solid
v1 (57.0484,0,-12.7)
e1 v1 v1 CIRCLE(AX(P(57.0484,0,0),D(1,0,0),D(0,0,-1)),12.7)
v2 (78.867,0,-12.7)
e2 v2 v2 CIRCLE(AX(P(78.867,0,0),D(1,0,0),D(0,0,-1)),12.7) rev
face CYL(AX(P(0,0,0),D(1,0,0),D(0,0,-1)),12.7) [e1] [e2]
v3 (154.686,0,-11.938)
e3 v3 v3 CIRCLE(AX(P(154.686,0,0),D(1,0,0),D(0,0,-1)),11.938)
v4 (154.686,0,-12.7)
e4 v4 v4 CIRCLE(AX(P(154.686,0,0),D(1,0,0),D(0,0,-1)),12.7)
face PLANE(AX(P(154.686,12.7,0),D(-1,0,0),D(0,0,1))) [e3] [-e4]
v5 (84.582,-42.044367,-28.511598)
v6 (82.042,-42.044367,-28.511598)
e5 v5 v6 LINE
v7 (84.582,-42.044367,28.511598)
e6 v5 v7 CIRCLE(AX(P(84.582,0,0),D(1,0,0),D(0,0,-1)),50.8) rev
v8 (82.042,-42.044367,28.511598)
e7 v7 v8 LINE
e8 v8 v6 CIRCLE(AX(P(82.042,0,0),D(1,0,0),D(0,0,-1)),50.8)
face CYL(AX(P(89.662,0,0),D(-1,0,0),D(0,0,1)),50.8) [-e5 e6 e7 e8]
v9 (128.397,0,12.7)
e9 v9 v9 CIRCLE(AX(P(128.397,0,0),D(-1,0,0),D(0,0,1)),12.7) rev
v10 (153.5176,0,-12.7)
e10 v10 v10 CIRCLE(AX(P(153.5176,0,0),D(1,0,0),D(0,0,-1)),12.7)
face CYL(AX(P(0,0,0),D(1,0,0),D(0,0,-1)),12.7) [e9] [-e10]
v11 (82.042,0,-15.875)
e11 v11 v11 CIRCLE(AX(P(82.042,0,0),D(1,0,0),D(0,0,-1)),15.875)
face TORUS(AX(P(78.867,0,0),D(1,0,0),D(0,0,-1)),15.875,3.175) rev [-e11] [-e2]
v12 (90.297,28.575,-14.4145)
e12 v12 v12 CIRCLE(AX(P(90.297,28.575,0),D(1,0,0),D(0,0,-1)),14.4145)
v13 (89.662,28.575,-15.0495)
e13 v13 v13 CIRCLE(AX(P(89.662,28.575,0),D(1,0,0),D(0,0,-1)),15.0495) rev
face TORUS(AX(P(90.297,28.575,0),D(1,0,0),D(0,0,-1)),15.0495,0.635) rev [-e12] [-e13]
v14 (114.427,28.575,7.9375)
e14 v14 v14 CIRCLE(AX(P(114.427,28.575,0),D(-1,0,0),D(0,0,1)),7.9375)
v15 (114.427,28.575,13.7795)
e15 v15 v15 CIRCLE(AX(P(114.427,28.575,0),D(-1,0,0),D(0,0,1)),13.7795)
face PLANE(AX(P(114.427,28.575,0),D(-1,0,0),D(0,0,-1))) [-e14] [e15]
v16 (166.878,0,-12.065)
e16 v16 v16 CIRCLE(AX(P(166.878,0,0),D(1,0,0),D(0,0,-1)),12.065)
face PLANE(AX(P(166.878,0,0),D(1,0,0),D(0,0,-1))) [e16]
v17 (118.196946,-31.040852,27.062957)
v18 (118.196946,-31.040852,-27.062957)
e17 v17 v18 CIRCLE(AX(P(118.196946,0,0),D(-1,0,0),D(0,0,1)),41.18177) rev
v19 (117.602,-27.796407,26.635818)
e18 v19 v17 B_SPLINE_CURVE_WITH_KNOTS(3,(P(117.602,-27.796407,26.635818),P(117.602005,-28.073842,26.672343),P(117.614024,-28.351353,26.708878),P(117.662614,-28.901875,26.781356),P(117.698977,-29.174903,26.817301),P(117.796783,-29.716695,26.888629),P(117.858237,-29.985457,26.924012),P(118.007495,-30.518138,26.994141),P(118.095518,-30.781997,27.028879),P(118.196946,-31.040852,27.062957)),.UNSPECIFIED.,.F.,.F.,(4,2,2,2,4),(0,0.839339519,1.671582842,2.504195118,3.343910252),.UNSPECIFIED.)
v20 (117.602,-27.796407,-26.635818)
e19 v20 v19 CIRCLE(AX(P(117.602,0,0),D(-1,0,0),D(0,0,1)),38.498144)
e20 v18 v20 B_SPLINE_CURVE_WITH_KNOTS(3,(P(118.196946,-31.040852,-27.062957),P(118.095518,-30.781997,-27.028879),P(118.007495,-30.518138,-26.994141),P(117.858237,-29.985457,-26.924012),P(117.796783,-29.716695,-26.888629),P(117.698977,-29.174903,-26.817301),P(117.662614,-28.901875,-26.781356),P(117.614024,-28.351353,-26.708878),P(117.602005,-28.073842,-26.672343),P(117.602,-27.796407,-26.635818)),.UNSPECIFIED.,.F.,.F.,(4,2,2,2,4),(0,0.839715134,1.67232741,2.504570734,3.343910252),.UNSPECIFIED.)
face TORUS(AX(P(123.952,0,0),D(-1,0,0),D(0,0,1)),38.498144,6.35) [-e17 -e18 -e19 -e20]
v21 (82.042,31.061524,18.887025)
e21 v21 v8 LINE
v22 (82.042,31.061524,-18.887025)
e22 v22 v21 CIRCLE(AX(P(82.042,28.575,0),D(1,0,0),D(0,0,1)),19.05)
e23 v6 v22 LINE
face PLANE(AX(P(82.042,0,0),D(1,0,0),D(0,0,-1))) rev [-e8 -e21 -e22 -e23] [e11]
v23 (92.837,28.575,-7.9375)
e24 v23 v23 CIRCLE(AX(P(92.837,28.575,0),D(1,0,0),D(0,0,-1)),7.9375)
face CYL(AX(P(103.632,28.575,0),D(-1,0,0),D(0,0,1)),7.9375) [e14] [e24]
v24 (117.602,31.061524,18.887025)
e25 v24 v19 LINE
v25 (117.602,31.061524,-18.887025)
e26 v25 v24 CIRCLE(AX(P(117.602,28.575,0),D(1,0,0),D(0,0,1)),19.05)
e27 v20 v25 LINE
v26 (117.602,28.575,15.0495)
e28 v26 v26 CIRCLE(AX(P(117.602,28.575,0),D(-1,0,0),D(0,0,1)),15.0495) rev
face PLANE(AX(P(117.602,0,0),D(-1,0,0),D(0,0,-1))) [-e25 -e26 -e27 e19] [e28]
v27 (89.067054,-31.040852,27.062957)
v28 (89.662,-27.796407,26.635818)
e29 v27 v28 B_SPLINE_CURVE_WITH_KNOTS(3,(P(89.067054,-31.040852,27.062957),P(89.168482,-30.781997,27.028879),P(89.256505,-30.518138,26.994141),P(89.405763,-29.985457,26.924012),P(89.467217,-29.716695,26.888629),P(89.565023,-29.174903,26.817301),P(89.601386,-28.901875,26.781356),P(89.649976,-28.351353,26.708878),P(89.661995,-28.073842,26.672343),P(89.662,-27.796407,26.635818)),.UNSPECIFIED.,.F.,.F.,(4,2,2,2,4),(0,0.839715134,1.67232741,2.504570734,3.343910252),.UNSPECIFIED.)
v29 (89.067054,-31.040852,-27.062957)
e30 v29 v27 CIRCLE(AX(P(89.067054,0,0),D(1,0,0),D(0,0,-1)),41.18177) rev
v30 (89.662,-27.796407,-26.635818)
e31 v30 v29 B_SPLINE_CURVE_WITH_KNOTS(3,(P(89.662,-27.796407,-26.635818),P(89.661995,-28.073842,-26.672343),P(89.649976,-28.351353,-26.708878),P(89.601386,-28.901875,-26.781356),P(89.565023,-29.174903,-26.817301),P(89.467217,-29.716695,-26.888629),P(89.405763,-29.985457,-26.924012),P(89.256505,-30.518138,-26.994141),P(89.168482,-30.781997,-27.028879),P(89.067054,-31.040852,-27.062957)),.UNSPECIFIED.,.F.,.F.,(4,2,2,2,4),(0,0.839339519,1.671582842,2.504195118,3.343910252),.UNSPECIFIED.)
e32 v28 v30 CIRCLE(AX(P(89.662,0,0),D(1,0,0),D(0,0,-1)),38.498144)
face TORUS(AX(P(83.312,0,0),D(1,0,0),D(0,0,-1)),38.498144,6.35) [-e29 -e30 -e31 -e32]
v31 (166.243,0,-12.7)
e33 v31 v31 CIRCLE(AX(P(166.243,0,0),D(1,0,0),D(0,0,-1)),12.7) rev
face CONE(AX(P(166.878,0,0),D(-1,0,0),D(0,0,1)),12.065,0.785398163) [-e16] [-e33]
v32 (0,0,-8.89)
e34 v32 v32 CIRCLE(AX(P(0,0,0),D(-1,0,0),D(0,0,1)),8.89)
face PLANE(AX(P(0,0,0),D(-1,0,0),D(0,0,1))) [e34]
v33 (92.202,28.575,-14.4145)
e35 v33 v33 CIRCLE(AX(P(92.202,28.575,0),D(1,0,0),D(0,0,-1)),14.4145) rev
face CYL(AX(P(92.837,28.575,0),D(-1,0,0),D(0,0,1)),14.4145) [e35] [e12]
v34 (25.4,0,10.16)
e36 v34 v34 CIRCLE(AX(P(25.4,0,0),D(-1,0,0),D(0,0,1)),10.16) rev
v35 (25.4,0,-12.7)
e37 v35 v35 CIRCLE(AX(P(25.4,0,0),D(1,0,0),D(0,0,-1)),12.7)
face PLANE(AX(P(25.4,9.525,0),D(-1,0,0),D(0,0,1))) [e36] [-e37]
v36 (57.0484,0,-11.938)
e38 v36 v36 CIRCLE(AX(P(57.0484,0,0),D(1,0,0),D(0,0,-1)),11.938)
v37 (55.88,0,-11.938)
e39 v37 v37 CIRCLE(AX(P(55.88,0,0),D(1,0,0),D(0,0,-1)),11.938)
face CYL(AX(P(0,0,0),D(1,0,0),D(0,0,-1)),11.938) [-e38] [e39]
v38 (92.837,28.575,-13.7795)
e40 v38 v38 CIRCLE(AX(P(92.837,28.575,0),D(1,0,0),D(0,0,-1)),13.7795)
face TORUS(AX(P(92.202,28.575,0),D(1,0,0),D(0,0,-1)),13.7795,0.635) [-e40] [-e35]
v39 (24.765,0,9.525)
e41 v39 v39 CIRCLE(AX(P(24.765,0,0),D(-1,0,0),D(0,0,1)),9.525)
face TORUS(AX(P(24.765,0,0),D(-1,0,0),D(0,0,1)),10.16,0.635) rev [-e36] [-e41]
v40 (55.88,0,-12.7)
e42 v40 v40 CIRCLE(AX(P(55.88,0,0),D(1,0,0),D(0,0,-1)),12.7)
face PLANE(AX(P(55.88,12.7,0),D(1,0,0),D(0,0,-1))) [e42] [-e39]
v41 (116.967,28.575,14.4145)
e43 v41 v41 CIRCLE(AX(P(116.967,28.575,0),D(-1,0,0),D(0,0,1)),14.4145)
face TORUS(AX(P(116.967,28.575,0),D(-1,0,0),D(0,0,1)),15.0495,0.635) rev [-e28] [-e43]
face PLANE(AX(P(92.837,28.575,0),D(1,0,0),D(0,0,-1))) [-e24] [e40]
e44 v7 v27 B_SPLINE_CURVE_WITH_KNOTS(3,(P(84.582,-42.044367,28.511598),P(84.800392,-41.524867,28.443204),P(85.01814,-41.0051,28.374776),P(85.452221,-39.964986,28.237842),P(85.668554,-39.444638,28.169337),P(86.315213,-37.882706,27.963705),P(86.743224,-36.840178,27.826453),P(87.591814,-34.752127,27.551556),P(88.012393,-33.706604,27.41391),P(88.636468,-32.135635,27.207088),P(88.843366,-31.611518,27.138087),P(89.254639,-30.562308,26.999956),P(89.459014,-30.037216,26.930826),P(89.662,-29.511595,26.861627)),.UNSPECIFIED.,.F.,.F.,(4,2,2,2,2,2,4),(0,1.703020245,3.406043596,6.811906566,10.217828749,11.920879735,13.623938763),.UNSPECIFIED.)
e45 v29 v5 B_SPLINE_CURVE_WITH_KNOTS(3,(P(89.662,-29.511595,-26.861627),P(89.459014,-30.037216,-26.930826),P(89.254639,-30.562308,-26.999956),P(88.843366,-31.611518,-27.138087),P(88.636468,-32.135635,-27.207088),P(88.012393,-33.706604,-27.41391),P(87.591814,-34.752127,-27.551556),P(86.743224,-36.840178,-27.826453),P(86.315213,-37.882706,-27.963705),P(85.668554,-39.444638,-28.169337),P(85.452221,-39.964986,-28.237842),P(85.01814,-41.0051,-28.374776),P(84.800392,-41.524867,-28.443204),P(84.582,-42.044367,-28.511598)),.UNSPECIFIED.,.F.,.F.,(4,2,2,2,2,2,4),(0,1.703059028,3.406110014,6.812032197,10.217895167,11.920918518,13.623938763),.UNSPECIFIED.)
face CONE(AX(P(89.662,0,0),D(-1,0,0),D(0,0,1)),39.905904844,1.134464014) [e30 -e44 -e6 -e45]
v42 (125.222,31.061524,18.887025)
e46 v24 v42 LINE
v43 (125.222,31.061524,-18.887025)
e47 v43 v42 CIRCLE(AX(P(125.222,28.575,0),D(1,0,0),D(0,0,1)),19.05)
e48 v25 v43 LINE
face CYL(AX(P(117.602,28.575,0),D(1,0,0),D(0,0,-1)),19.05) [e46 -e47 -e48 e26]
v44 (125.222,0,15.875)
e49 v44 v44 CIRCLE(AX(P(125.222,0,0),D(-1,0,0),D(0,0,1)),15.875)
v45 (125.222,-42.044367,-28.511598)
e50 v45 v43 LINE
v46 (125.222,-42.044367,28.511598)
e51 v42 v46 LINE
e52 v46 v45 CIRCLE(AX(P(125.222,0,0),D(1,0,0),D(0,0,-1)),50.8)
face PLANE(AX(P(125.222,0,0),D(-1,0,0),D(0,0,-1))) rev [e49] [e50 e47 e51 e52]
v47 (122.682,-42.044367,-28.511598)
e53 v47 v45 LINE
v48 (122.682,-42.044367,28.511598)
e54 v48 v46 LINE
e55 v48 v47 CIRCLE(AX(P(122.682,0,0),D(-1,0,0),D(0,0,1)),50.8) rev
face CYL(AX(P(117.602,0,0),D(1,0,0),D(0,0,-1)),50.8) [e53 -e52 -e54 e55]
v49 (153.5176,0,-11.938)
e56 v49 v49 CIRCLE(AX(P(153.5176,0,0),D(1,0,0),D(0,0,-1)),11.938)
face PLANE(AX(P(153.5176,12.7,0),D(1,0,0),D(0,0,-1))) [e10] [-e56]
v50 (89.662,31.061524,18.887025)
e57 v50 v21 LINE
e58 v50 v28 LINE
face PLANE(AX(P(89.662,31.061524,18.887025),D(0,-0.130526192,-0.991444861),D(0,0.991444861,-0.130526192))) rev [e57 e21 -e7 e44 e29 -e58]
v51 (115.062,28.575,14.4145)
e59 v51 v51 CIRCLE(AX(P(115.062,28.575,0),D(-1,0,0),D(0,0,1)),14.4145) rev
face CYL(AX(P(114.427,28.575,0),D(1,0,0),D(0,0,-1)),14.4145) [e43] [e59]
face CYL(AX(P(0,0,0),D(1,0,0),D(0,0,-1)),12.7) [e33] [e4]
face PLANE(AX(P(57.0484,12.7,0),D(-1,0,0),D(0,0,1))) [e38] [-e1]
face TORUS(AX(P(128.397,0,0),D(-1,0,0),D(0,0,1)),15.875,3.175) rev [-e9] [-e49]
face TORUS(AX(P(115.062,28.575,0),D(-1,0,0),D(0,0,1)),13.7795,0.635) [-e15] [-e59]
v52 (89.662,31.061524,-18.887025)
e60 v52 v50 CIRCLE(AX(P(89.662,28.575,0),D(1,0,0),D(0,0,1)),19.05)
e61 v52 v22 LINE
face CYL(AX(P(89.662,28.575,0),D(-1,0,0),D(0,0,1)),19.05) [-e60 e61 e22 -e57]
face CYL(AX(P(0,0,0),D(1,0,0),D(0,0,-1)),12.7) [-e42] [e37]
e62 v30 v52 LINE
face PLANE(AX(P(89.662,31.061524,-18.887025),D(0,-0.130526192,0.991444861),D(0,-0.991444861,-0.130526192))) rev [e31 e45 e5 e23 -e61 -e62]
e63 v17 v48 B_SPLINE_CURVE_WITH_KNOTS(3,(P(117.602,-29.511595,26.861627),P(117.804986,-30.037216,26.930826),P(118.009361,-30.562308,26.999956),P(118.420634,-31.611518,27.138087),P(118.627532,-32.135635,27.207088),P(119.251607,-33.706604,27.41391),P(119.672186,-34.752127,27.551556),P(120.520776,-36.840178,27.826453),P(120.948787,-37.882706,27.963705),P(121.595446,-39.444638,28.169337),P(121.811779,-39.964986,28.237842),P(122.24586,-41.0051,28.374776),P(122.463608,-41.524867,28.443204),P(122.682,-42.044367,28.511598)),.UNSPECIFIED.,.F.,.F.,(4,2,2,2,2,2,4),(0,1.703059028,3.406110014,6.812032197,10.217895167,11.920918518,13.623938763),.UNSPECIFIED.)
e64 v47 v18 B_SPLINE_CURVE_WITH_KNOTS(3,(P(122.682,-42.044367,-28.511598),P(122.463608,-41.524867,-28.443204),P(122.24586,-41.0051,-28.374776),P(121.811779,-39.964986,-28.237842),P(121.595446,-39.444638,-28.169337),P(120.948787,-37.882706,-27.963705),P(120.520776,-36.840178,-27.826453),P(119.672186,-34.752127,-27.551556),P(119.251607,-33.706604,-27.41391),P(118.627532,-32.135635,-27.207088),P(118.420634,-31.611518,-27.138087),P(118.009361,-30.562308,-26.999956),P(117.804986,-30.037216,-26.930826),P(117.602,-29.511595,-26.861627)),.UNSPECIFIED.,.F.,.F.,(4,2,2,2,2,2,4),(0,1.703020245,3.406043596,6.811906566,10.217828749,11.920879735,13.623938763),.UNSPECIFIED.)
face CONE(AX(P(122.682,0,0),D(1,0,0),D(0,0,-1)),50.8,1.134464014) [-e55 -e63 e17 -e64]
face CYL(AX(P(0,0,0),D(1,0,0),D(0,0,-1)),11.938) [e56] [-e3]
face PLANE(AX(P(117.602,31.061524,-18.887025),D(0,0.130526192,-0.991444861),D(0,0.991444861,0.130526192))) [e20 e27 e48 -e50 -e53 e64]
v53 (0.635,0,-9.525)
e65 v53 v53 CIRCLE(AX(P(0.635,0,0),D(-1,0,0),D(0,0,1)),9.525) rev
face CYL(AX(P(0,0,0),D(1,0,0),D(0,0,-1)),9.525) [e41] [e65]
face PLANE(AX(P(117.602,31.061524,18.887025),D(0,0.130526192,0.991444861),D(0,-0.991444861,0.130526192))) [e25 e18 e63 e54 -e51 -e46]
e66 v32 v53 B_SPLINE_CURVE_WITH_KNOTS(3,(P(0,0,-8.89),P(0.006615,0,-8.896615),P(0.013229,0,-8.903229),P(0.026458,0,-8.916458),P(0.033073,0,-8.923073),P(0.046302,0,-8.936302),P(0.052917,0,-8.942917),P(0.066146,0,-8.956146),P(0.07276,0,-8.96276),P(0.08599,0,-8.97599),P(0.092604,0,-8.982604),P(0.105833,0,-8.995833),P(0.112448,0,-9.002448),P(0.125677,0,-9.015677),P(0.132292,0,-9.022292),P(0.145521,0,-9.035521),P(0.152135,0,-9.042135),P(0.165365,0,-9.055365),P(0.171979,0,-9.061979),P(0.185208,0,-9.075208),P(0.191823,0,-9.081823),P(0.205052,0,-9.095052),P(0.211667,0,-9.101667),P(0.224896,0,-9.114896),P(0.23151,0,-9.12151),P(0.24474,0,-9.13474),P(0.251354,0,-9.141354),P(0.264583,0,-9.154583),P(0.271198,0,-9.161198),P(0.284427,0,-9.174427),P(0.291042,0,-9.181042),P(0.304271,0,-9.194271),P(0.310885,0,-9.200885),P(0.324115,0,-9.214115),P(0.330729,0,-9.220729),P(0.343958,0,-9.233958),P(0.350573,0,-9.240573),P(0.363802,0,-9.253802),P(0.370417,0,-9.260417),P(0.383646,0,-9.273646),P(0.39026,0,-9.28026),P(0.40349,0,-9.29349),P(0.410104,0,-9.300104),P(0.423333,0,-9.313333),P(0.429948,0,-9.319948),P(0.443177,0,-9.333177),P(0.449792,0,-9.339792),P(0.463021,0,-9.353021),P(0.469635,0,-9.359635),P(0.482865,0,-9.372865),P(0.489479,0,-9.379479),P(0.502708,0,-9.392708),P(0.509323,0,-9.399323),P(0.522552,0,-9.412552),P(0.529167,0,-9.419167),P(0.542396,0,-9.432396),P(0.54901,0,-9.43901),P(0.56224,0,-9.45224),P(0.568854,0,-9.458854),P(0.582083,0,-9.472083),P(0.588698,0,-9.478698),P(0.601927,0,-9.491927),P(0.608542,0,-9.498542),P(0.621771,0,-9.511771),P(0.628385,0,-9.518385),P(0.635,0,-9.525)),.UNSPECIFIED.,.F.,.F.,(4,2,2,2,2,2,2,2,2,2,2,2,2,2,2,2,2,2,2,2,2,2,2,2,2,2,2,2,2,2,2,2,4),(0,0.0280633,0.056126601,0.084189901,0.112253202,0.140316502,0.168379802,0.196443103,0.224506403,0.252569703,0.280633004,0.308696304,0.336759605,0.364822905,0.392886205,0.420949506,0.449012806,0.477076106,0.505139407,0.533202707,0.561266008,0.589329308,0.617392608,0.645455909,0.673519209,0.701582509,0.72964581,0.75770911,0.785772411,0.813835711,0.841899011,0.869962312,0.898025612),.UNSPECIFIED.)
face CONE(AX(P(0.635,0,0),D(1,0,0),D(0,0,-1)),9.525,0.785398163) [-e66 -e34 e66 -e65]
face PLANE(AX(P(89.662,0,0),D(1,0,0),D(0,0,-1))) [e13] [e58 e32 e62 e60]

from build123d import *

# Parameters (mm, degrees)
BOSS_EXTRUDE1_DEPTH   = 7.62
SKETCH3_R             = 14.4145
BOSS_EXTRUDE2_DEPTH   = 3.175
SKETCH4_R             = 7.9375
BOSS_EXTRUDE3_DEPTH   = 10.795
CHAMFER1_SIZE         = 5.08
CHAMFER1_SIZE2        = 10.894095156
FILLET1_R             = 6.35
MIRROR1_START         = 117.602
MIRROR1_OUTLINE_R     = 12.7
MIRROR1_DEPTH         = 7.62
MIRROR1_START_2       = 103.632
MIRROR1_2_OUTLINE_R   = 7.9375
MIRROR1_2_DEPTH       = 13.97
MIRROR1_START_3       = 114.427
MIRROR1_3_OUTLINE_R   = 14.4145
MIRROR1_3_OUTLINE_R_2 = 7.9375
MIRROR1_3_DEPTH       = 3.175
MIRROR1_4_ANGLE       = 87.55708
FILLET2_R             = 0.635
CUT_EXTRUDE1_START    = 27.94
SKETCH5_R             = 12.7
CUT_EXTRUDE1_DEPTH    = 27.94
CHAMFER2_SIZE         = 0.635
FILLET3_R             = 3.175


with BuildPart() as part:
    # Sketch1 → Revolve1 (revolve)
    with BuildSketch(Plane.XY, mode=Mode.PRIVATE) as revolve1_sk:
        Polygon((25.4, 12.7), (55.88, 12.7), (55.88, 11.938), (57.0484, 11.938), (57.0484, 12.7), (153.5176, 12.7), (153.5176, 11.938), (154.686, 11.938), (154.686, 12.7), (166.878, 12.7), (166.878, 0), (0, 0), (0, 9.525), (25.4, 9.525), align=None)
    revolve(revolve1_sk.sketch.rotate(Axis((0, 0, 0), (-1, 0, 0)), 90), axis=Axis((0, 0, 0), (-1, 0, 0)))

    # Sketch2 → Boss-Extrude1 (add)
    with BuildSketch(Plane(origin=(82.042, 0, 0), x_dir=(0, 0, -1), z_dir=(1, 0, 0))):
        with BuildLine():
            Line((-18.887024609, 31.061523962), (-28.511597739, -42.044366975))
            ThreePointArc((-28.511597739, -42.044366975), (0, -50.8), (28.511597739, -42.044366975))
            Line((28.511597739, -42.044366975), (18.887024609, 31.061523962))
            ThreePointArc((18.887024609, 31.061523962), (0, 47.625), (-18.887024609, 31.061523962))
        make_face()
    extrude(amount=BOSS_EXTRUDE1_DEPTH)

    # Sketch3 → Boss-Extrude2 (add)
    with BuildSketch(Plane(origin=(89.662, 0, 0), x_dir=(0, 0, -1), z_dir=(1, 0, 0))):
        with Locations((0, 28.575)):
            Circle(SKETCH3_R)
    extrude(amount=BOSS_EXTRUDE2_DEPTH)

    # Sketch4 → Boss-Extrude3 (add)
    with BuildSketch(Plane(origin=(92.837, 0, 0), x_dir=(0, 0, -1), z_dir=(1, 0, 0))):
        with Locations((0, 28.575)):
            Circle(SKETCH4_R)
    extrude(amount=BOSS_EXTRUDE3_DEPTH)

    # Chamfer1
    chamfer1_edges = [part.edges().sort_by_distance(p)[0] for p in [
        (89.662, -50.8, 0),
    ]]
    chamfer1_side = [part.faces().sort_by_distance(p)[0] for p in [
        (85.852, -50.8, 0),
    ]]
    chamfer(chamfer1_edges, length=CHAMFER1_SIZE, length2=CHAMFER1_SIZE2, reference=chamfer1_side[0])

    # Fillet1
    fillet1_edges = [part.edges().sort_by_distance(p)[0] for p in [
        (89.662, -39.905904844, 0),
    ]]
    fillet(fillet1_edges, radius=FILLET1_R)

    # Mirror1: read off the stored shape, not the designer's step
    # Mirror1 outline → Mirror1 (add)
    with BuildSketch(Plane.YZ.offset(MIRROR1_START)):
        with BuildLine():
            Line((31.061523962, 18.887024609), (-42.044366975, 28.511597739))
            ThreePointArc((-42.044366975, 28.511597739), (-50.8, 0), (-42.044366975, -28.511597739))
            Line((-42.044366975, -28.511597739), (31.061523962, -18.887024609))
            ThreePointArc((31.061523962, -18.887024609), (47.625, 0), (31.061523962, 18.887024609))
        make_face()
        Circle(MIRROR1_OUTLINE_R, mode=Mode.SUBTRACT)
    extrude(amount=MIRROR1_DEPTH)

    # Mirror1 2 outline → Mirror1 2 (add)
    with BuildSketch(Plane.YZ.offset(MIRROR1_START_2)):
        with Locations((28.575, 0)):
            Circle(MIRROR1_2_OUTLINE_R)
    extrude(amount=MIRROR1_2_DEPTH)

    # Mirror1 3 outline → Mirror1 3 (add)
    with BuildSketch(Plane.YZ.offset(MIRROR1_START_3)):
        with Locations((28.575, 0)):
            Circle(MIRROR1_3_OUTLINE_R)
        with Locations((28.575, 0)):
            Circle(MIRROR1_3_OUTLINE_R_2, mode=Mode.SUBTRACT)
    extrude(amount=MIRROR1_3_DEPTH)

    # Mirror1 4 outline → Mirror1 4 (revolve, cut)
    with BuildSketch(Plane(origin=(0, 0, 0), x_dir=(0, -0.7220194162000995, 0.6918727936767477), z_dir=(0, 0.6918727936767477, 0.7220194162000995))):
        with BuildLine():
            Line((50.8, 122.682), (41.181769698, 118.196945552))
            ThreePointArc((41.181769698, 118.196945552), (39.872535284, 117.752520355), (38.498143736, 117.602))
            Line((38.498143736, 117.602), (50.8, 117.602))
            Line((50.8, 117.602), (50.8, 122.682))
        make_face()
    revolve(axis=Axis((0, 0, 0), (1, 0, 0)), revolution_arc=MIRROR1_4_ANGLE, mode=Mode.SUBTRACT)

    # Fillet2
    fillet2_edges = [part.edges().sort_by_distance(p)[0] for p in [
        (25.4, 0, 9.525),
        (89.662, 28.575, 14.4145),
        (92.837, 28.575, 14.4145),
        (117.602, 14.1605, 0),
        (114.427, 14.1605, 0),
    ]]
    fillet(fillet2_edges, radius=FILLET2_R)

    # Sketch5 → Cut-Extrude1 (cut)
    with BuildSketch(Plane(origin=(89.662, 0, 0), x_dir=(0, 0, -1), z_dir=(1, 0, 0)).offset(CUT_EXTRUDE1_START)):
        Circle(SKETCH5_R)
    extrude(amount=-CUT_EXTRUDE1_DEPTH, mode=Mode.SUBTRACT)

    # Chamfer2
    chamfer2_edges = [part.edges().sort_by_distance(p)[0] for p in [
        (166.878, 0, 12.7),
        (0, 0, 9.525),
    ]]
    chamfer(chamfer2_edges, length=CHAMFER2_SIZE)

    # Fillet3
    fillet3_edges = [part.edges().sort_by_distance(p)[0] for p in [
        (82.042, 0, 12.7),
        (125.222, 0, 12.7),
    ]]
    fillet(fillet3_edges, radius=FILLET3_R)


solid = part.part
